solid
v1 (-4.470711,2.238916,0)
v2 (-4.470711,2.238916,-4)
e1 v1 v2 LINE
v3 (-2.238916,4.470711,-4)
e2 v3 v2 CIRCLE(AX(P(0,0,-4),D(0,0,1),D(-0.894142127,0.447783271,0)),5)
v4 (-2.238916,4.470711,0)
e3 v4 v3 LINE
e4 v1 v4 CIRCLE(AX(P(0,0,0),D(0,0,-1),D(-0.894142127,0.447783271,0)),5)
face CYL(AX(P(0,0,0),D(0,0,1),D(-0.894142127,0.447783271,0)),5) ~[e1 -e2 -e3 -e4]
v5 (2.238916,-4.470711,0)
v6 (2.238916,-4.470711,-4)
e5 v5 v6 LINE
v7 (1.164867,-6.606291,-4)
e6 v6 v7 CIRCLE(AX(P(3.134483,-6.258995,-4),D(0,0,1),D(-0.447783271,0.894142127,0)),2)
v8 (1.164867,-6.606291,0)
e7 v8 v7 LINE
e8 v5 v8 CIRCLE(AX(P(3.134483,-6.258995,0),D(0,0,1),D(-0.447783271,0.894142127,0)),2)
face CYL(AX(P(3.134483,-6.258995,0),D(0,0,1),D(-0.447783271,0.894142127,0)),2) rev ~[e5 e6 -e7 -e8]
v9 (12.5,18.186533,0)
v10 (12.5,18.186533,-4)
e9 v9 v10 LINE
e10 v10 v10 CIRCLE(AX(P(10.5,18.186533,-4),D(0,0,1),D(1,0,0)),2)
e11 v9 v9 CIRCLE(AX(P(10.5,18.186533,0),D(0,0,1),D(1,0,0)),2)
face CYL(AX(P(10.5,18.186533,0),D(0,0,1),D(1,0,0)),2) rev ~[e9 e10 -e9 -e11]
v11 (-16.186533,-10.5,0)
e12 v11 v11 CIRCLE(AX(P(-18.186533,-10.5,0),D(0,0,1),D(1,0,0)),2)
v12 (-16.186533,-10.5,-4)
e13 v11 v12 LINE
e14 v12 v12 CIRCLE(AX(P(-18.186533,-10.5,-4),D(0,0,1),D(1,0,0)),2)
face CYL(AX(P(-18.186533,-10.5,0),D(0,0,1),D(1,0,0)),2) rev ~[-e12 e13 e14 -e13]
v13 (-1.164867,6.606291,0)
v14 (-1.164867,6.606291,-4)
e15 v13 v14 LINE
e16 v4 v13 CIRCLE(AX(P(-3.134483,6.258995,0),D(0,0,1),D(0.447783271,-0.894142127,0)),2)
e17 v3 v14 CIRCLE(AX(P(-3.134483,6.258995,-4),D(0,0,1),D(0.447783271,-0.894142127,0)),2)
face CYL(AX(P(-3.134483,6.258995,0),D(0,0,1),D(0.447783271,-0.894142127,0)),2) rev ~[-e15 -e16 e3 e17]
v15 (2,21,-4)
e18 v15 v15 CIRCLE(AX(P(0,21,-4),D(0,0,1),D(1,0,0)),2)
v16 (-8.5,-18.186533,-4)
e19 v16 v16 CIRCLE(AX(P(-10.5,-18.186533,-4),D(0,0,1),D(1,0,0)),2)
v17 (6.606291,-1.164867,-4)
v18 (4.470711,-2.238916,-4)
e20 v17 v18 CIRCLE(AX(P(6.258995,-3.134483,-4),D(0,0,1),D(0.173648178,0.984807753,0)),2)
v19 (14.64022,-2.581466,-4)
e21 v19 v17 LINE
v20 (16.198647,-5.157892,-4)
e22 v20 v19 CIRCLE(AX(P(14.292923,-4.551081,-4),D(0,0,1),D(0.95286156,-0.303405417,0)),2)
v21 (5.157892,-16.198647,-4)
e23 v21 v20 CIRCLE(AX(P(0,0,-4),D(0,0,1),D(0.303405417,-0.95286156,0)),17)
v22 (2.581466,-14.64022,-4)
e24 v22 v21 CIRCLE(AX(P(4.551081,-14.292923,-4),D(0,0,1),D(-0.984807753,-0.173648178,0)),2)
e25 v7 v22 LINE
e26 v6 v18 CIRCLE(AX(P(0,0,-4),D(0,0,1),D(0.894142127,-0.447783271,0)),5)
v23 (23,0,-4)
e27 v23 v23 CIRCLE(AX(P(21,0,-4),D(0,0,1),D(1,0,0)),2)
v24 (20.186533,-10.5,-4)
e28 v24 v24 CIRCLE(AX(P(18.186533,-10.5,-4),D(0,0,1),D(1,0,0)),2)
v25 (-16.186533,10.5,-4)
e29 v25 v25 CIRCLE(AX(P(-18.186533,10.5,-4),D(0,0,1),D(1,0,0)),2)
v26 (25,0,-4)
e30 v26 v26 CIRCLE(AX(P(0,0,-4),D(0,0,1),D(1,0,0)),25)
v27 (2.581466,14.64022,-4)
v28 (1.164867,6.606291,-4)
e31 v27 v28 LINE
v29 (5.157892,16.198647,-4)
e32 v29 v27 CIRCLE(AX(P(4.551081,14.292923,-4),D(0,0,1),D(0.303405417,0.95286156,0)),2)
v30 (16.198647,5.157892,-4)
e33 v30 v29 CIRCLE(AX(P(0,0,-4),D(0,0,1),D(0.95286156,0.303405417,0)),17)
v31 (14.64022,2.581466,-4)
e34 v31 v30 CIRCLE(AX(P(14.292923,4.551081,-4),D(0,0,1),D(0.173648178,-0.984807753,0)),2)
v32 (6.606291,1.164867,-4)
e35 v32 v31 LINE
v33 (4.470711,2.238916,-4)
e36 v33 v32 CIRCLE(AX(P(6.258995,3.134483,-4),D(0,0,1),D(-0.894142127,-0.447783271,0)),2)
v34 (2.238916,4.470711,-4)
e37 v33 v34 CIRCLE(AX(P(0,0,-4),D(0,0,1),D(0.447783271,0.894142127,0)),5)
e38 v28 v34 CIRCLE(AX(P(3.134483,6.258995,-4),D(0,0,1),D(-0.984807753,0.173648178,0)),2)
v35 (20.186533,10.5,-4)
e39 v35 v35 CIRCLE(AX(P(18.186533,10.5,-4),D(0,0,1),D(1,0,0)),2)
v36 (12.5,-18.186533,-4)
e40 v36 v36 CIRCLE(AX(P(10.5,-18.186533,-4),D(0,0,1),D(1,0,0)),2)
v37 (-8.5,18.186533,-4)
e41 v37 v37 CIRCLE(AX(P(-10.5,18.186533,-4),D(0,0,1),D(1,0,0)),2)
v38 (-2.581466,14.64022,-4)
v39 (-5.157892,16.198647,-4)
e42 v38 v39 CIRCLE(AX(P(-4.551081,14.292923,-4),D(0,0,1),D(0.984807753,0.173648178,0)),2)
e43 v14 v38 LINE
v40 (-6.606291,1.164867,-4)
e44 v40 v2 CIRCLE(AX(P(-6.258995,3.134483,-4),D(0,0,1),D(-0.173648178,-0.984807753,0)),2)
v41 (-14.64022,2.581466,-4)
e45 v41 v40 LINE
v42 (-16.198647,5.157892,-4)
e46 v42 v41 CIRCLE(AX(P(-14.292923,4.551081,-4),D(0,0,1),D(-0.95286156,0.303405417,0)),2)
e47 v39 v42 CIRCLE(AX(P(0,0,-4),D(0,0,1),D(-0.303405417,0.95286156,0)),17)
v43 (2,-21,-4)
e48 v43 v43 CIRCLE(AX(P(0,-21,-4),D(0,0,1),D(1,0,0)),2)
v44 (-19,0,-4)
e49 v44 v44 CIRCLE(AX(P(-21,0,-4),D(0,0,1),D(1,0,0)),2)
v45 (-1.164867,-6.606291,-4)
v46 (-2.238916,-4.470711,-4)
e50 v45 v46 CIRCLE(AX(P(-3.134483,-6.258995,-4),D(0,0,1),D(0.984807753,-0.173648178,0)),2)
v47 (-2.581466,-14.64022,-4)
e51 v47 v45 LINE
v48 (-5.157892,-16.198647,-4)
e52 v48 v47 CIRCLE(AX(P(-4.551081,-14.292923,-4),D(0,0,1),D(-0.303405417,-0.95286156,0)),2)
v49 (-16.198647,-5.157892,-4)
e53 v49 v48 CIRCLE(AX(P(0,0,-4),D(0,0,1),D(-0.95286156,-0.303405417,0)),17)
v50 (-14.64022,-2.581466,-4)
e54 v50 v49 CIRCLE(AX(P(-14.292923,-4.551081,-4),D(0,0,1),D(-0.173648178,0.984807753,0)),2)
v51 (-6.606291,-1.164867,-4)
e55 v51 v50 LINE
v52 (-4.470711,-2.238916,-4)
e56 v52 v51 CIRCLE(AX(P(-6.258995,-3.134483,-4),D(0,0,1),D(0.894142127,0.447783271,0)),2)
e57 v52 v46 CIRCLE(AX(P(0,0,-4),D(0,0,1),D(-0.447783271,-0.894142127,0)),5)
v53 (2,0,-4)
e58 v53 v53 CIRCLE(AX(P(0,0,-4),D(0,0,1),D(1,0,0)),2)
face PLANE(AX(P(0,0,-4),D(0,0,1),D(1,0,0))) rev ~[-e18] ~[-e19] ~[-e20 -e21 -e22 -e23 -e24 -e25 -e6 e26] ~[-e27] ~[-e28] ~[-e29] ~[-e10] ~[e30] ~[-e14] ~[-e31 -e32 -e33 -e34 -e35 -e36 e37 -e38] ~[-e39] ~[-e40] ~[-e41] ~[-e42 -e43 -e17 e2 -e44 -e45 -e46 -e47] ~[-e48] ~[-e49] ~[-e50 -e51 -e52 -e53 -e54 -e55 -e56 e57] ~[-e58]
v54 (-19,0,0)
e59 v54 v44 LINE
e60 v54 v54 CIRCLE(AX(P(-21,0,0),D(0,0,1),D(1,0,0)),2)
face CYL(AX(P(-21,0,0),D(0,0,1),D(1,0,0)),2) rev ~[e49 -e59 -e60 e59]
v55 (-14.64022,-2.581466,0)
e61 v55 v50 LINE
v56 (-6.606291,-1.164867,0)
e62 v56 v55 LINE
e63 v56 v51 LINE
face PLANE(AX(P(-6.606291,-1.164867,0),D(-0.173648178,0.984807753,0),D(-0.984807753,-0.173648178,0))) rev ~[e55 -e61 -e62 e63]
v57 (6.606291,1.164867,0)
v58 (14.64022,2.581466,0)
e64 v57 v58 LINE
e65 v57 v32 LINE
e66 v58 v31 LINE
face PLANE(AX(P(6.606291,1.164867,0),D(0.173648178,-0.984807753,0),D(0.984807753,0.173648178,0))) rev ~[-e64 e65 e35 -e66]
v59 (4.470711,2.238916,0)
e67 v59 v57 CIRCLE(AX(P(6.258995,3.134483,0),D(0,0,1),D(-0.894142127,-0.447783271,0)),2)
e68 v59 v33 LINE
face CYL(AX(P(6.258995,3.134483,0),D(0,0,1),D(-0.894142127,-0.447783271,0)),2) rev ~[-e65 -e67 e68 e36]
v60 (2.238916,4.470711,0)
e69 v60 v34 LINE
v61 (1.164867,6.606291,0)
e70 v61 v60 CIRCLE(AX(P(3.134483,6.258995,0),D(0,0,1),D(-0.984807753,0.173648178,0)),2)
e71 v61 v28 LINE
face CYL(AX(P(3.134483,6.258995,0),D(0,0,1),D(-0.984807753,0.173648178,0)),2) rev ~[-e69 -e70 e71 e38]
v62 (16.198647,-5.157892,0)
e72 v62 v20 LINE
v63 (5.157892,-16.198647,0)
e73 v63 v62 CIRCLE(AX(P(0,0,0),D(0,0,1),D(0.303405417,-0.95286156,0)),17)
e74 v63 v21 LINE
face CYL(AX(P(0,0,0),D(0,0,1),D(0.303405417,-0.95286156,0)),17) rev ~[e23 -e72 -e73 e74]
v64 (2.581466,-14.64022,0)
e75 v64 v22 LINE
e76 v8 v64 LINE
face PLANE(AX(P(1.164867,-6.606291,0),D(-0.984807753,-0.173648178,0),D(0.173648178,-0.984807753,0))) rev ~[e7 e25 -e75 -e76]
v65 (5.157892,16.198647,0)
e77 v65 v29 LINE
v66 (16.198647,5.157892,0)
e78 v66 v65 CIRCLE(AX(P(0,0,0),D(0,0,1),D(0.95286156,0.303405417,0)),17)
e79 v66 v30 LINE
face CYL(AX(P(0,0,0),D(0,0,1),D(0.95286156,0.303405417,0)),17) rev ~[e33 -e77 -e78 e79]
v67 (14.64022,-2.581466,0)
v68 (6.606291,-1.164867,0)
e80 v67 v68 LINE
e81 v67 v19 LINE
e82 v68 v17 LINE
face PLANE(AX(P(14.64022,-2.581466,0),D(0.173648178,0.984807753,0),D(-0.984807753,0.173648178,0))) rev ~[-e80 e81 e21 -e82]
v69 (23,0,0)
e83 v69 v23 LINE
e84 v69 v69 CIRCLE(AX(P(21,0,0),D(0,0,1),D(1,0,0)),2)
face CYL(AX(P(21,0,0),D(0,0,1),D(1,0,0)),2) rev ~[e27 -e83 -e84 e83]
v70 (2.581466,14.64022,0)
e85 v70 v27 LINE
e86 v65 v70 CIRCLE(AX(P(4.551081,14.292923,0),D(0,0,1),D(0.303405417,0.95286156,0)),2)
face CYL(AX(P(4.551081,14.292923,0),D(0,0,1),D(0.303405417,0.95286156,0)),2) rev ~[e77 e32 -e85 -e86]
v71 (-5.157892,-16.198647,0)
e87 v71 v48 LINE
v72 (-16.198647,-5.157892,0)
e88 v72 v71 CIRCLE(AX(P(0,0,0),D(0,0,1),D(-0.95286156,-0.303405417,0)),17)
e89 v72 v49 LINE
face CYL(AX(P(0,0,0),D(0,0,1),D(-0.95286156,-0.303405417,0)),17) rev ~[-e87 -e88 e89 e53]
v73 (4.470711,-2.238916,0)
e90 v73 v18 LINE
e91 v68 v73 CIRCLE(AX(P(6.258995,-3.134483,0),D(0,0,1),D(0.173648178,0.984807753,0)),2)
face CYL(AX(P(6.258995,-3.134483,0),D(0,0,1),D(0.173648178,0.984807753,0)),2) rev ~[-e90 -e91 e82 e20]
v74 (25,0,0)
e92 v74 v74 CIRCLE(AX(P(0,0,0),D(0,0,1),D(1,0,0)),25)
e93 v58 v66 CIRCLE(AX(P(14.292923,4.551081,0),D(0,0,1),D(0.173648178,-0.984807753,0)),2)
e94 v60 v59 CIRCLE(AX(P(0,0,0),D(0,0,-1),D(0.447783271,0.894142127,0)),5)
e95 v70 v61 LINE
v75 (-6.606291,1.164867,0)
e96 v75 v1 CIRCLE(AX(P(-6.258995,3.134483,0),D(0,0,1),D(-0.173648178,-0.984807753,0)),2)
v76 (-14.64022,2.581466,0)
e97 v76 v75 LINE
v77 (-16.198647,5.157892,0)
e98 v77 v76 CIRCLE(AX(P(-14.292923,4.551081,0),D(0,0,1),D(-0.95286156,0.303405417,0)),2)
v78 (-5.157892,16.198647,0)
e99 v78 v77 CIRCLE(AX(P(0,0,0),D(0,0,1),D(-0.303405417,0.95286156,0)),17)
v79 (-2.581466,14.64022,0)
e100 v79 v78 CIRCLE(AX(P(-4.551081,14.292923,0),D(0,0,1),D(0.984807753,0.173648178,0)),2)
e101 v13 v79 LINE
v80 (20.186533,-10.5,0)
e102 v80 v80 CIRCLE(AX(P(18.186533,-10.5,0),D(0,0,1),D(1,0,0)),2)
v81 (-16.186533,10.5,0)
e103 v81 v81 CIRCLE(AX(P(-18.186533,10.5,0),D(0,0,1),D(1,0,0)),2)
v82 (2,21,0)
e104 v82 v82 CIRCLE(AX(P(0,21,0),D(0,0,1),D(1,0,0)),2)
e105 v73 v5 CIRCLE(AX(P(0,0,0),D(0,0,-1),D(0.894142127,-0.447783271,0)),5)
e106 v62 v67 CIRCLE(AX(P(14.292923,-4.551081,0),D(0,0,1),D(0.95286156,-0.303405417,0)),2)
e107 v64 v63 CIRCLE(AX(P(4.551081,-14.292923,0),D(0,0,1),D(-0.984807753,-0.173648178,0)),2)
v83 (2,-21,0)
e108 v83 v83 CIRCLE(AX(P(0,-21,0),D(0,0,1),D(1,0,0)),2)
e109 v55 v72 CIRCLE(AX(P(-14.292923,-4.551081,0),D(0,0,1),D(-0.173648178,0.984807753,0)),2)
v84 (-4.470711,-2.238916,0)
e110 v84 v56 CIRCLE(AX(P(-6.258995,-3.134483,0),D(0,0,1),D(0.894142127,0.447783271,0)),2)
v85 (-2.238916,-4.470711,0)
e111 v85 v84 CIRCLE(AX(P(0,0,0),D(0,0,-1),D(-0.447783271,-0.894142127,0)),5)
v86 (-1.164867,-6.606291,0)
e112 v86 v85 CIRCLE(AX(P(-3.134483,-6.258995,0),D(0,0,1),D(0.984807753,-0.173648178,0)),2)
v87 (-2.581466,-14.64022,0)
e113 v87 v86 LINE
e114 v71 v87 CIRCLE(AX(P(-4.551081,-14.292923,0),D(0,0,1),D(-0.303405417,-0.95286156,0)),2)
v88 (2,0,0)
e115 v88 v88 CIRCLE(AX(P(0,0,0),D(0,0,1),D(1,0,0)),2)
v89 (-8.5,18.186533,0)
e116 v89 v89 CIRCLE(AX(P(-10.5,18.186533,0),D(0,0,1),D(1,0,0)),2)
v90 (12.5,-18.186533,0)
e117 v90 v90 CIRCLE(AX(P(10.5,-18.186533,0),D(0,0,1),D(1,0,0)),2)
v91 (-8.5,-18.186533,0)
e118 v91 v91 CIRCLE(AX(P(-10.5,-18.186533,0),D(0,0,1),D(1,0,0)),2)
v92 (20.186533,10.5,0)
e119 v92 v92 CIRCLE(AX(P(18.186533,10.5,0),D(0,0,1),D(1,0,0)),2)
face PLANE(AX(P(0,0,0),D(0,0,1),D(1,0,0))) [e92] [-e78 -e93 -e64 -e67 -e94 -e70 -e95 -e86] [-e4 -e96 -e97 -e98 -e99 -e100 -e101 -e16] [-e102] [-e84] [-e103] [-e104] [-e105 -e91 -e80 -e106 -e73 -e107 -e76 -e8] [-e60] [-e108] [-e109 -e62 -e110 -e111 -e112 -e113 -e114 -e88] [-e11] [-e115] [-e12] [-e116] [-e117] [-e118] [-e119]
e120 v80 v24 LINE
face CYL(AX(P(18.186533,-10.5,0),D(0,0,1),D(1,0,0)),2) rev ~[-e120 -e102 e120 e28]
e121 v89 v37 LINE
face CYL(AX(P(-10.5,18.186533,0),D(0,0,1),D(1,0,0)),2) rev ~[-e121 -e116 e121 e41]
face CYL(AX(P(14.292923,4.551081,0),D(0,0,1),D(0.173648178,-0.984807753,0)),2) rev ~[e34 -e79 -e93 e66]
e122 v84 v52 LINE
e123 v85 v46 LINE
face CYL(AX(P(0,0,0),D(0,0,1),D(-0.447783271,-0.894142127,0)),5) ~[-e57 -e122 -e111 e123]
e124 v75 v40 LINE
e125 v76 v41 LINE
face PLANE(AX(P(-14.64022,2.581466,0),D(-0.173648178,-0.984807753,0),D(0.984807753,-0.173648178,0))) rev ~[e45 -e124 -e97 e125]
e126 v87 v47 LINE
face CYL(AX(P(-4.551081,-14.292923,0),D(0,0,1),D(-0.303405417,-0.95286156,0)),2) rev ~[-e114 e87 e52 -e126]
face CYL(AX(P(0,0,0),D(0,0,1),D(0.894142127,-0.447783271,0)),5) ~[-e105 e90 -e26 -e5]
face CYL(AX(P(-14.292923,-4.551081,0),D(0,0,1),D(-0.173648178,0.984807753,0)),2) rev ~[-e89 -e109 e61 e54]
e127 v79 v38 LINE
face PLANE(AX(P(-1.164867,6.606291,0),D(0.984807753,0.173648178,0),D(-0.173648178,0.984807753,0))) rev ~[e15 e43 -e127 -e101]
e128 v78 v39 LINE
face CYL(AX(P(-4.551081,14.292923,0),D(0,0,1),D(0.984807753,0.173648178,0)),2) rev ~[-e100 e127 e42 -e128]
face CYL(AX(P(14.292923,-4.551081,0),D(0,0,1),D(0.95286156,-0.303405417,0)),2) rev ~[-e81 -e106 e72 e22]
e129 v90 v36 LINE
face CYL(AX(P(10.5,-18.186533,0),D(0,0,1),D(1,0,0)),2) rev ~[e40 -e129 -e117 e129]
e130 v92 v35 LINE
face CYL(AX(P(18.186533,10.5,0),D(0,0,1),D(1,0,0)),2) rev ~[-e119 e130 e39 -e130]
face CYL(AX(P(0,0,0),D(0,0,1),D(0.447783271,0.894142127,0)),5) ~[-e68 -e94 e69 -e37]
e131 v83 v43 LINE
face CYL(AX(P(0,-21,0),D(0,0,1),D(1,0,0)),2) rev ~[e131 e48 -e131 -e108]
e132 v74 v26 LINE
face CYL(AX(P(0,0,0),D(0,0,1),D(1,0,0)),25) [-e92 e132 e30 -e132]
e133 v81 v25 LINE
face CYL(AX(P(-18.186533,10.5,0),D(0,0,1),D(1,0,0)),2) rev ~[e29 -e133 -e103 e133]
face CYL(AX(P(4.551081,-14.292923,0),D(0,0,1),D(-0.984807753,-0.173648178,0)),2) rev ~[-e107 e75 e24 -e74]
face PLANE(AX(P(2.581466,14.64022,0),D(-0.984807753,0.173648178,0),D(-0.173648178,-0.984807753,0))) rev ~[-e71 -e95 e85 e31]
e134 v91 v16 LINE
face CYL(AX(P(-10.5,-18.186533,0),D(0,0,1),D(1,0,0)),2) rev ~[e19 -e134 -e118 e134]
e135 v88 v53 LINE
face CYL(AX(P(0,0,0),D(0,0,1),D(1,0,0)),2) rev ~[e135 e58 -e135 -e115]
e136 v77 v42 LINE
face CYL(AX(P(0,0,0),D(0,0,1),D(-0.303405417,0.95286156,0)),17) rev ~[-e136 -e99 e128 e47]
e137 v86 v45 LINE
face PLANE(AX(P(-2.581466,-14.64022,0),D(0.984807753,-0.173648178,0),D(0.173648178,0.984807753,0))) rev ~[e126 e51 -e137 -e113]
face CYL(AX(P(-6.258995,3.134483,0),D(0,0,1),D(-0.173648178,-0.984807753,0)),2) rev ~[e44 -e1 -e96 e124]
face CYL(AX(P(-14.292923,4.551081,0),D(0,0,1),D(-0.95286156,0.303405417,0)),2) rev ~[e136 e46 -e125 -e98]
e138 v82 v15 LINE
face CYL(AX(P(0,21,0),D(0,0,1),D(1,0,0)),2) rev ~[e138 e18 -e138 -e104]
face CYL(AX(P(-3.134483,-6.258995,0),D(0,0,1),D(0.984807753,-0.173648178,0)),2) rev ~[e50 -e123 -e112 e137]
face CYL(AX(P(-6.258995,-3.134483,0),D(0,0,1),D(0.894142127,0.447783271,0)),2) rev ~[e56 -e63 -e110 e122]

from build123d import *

# Parameters (mm, degrees)
F0_R     = 25
F0_R_2   = 2
F1_DEPTH = 4
F3_DEPTH = 25
F4_DEPTH = 25


# Not quite as in the source:
# - a feature names something its author has since deleted; it is built from what else it names


with BuildPart() as f1:
    # F0 (on Top) → F1 (new body)
    with BuildSketch(Plane.XY):
        Circle(F0_R)
        with Locations((-10.5, -18.1865334795)):
            Circle(F0_R_2, mode=Mode.SUBTRACT)
        with Locations((-18.1865334795, -10.5)):
            Circle(F0_R_2, mode=Mode.SUBTRACT)
        with Locations((0, -21)):
            Circle(F0_R_2, mode=Mode.SUBTRACT)
        with Locations((10.5, -18.1865334795)):
            Circle(F0_R_2, mode=Mode.SUBTRACT)
        with Locations((18.1865334795, -10.5)):
            Circle(F0_R_2, mode=Mode.SUBTRACT)
        with Locations((-21, 0)):
            Circle(F0_R_2, mode=Mode.SUBTRACT)
        with Locations((-18.1865334795, 10.5)):
            Circle(F0_R_2, mode=Mode.SUBTRACT)
        with Locations((-10.5, 18.1865334795)):
            Circle(F0_R_2, mode=Mode.SUBTRACT)
        Circle(F0_R_2, mode=Mode.SUBTRACT)
        with Locations((21, 0)):
            Circle(F0_R_2, mode=Mode.SUBTRACT)
        with Locations((18.1865334795, 10.5)):
            Circle(F0_R_2, mode=Mode.SUBTRACT)
        with Locations((10.5, 18.1865334795)):
            Circle(F0_R_2, mode=Mode.SUBTRACT)
        with Locations((0, 21)):
            Circle(F0_R_2, mode=Mode.SUBTRACT)
    extrude(amount=-F1_DEPTH)

    # F2 (on face) → F3 (cut)
    with BuildSketch(Plane.XY):
        with BuildLine():
            ThreePointArc((4.470710633, 2.2389163531), (5.3603810508, 1.3477279657), (6.6062912415, 1.1648673883))
            Line((6.6062912415, 1.1648673883), (14.6402197592, 2.581465747))
            ThreePointArc((14.6402197592, 2.581465747), (16.0042145423, 3.5159567971), (16.1986465243, 5.1578920868))
            ThreePointArc((16.1986465243, 5.1578920868), (12.0208152802, 12.0208152802), (5.1578920868, 16.1986465243))
            ThreePointArc((5.1578920868, 16.1986465243), (3.5159567971, 16.0042145423), (2.581465747, 14.6402197592))
            Line((2.581465747, 14.6402197592), (1.1648673883, 6.6062912415))
            ThreePointArc((1.1648673883, 6.6062912415), (1.3477279657, 5.3603810508), (2.2389163531, 4.470710633))
            ThreePointArc((2.2389163531, 4.470710633), (3.5355339059, 3.5355339059), (4.470710633, 2.2389163531))
        make_face()
        with BuildLine():
            ThreePointArc((-4.470710633, -2.2389163531), (-5.3603810508, -1.3477279657), (-6.6062912415, -1.1648673883))
            Line((-6.6062912415, -1.1648673883), (-14.6402197592, -2.581465747))
            ThreePointArc((-14.6402197592, -2.581465747), (-16.0042145423, -3.5159567971), (-16.1986465243, -5.1578920868))
            ThreePointArc((-16.1986465243, -5.1578920868), (-12.0208152802, -12.0208152802), (-5.1578920868, -16.1986465243))
            ThreePointArc((-5.1578920868, -16.1986465243), (-3.5159567971, -16.0042145423), (-2.581465747, -14.6402197592))
            Line((-2.581465747, -14.6402197592), (-1.1648673883, -6.6062912415))
            ThreePointArc((-1.1648673883, -6.6062912415), (-1.3477279657, -5.3603810508), (-2.2389163531, -4.470710633))
            ThreePointArc((-2.2389163531, -4.470710633), (-3.5355339059, -3.5355339059), (-4.470710633, -2.2389163531))
        make_face()
        with BuildLine():
            ThreePointArc((2.2389163531, -4.470710633), (1.3477279657, -5.3603810508), (1.1648673883, -6.6062912415))
            Line((1.1648673883, -6.6062912415), (2.581465747, -14.6402197592))
            ThreePointArc((2.581465747, -14.6402197592), (3.5159567971, -16.0042145423), (5.1578920868, -16.1986465243))
            ThreePointArc((5.1578920868, -16.1986465243), (12.0208152802, -12.0208152802), (16.1986465243, -5.1578920868))
            ThreePointArc((16.1986465243, -5.1578920868), (16.0042145423, -3.5159567971), (14.6402197592, -2.581465747))
            Line((14.6402197592, -2.581465747), (6.6062912415, -1.1648673883))
            ThreePointArc((6.6062912415, -1.1648673883), (5.3603810508, -1.3477279657), (4.470710633, -2.2389163531))
            ThreePointArc((4.470710633, -2.2389163531), (3.5355339059, -3.5355339059), (2.2389163531, -4.470710633))
        make_face()
    extrude(amount=-F3_DEPTH, mode=Mode.SUBTRACT)

    # F2 (on face) → F4 (cut)
    with BuildSketch(Plane.XY):
        with BuildLine():
            ThreePointArc((-2.581465747, 14.6402197592), (-3.5159567971, 16.0042145423), (-5.1578920868, 16.1986465243))
            ThreePointArc((-5.1578920868, 16.1986465243), (-12.0208152802, 12.0208152802), (-16.1986465243, 5.1578920868))
            ThreePointArc((-16.1986465243, 5.1578920868), (-16.0042145423, 3.5159567971), (-14.6402197592, 2.581465747))
            Line((-14.6402197592, 2.581465747), (-6.6062912415, 1.1648673883))
            ThreePointArc((-6.6062912415, 1.1648673883), (-5.3603810508, 1.3477279657), (-4.470710633, 2.2389163531))
            ThreePointArc((-4.470710633, 2.2389163531), (-3.5355339059, 3.5355339059), (-2.2389163531, 4.470710633))
            ThreePointArc((-2.2389163531, 4.470710633), (-1.3477279657, 5.3603810508), (-1.1648673883, 6.6062912415))
            Line((-1.1648673883, 6.6062912415), (-2.581465747, 14.6402197592))
        make_face()
    extrude(amount=-F4_DEPTH, mode=Mode.SUBTRACT)


solid = f1.part
